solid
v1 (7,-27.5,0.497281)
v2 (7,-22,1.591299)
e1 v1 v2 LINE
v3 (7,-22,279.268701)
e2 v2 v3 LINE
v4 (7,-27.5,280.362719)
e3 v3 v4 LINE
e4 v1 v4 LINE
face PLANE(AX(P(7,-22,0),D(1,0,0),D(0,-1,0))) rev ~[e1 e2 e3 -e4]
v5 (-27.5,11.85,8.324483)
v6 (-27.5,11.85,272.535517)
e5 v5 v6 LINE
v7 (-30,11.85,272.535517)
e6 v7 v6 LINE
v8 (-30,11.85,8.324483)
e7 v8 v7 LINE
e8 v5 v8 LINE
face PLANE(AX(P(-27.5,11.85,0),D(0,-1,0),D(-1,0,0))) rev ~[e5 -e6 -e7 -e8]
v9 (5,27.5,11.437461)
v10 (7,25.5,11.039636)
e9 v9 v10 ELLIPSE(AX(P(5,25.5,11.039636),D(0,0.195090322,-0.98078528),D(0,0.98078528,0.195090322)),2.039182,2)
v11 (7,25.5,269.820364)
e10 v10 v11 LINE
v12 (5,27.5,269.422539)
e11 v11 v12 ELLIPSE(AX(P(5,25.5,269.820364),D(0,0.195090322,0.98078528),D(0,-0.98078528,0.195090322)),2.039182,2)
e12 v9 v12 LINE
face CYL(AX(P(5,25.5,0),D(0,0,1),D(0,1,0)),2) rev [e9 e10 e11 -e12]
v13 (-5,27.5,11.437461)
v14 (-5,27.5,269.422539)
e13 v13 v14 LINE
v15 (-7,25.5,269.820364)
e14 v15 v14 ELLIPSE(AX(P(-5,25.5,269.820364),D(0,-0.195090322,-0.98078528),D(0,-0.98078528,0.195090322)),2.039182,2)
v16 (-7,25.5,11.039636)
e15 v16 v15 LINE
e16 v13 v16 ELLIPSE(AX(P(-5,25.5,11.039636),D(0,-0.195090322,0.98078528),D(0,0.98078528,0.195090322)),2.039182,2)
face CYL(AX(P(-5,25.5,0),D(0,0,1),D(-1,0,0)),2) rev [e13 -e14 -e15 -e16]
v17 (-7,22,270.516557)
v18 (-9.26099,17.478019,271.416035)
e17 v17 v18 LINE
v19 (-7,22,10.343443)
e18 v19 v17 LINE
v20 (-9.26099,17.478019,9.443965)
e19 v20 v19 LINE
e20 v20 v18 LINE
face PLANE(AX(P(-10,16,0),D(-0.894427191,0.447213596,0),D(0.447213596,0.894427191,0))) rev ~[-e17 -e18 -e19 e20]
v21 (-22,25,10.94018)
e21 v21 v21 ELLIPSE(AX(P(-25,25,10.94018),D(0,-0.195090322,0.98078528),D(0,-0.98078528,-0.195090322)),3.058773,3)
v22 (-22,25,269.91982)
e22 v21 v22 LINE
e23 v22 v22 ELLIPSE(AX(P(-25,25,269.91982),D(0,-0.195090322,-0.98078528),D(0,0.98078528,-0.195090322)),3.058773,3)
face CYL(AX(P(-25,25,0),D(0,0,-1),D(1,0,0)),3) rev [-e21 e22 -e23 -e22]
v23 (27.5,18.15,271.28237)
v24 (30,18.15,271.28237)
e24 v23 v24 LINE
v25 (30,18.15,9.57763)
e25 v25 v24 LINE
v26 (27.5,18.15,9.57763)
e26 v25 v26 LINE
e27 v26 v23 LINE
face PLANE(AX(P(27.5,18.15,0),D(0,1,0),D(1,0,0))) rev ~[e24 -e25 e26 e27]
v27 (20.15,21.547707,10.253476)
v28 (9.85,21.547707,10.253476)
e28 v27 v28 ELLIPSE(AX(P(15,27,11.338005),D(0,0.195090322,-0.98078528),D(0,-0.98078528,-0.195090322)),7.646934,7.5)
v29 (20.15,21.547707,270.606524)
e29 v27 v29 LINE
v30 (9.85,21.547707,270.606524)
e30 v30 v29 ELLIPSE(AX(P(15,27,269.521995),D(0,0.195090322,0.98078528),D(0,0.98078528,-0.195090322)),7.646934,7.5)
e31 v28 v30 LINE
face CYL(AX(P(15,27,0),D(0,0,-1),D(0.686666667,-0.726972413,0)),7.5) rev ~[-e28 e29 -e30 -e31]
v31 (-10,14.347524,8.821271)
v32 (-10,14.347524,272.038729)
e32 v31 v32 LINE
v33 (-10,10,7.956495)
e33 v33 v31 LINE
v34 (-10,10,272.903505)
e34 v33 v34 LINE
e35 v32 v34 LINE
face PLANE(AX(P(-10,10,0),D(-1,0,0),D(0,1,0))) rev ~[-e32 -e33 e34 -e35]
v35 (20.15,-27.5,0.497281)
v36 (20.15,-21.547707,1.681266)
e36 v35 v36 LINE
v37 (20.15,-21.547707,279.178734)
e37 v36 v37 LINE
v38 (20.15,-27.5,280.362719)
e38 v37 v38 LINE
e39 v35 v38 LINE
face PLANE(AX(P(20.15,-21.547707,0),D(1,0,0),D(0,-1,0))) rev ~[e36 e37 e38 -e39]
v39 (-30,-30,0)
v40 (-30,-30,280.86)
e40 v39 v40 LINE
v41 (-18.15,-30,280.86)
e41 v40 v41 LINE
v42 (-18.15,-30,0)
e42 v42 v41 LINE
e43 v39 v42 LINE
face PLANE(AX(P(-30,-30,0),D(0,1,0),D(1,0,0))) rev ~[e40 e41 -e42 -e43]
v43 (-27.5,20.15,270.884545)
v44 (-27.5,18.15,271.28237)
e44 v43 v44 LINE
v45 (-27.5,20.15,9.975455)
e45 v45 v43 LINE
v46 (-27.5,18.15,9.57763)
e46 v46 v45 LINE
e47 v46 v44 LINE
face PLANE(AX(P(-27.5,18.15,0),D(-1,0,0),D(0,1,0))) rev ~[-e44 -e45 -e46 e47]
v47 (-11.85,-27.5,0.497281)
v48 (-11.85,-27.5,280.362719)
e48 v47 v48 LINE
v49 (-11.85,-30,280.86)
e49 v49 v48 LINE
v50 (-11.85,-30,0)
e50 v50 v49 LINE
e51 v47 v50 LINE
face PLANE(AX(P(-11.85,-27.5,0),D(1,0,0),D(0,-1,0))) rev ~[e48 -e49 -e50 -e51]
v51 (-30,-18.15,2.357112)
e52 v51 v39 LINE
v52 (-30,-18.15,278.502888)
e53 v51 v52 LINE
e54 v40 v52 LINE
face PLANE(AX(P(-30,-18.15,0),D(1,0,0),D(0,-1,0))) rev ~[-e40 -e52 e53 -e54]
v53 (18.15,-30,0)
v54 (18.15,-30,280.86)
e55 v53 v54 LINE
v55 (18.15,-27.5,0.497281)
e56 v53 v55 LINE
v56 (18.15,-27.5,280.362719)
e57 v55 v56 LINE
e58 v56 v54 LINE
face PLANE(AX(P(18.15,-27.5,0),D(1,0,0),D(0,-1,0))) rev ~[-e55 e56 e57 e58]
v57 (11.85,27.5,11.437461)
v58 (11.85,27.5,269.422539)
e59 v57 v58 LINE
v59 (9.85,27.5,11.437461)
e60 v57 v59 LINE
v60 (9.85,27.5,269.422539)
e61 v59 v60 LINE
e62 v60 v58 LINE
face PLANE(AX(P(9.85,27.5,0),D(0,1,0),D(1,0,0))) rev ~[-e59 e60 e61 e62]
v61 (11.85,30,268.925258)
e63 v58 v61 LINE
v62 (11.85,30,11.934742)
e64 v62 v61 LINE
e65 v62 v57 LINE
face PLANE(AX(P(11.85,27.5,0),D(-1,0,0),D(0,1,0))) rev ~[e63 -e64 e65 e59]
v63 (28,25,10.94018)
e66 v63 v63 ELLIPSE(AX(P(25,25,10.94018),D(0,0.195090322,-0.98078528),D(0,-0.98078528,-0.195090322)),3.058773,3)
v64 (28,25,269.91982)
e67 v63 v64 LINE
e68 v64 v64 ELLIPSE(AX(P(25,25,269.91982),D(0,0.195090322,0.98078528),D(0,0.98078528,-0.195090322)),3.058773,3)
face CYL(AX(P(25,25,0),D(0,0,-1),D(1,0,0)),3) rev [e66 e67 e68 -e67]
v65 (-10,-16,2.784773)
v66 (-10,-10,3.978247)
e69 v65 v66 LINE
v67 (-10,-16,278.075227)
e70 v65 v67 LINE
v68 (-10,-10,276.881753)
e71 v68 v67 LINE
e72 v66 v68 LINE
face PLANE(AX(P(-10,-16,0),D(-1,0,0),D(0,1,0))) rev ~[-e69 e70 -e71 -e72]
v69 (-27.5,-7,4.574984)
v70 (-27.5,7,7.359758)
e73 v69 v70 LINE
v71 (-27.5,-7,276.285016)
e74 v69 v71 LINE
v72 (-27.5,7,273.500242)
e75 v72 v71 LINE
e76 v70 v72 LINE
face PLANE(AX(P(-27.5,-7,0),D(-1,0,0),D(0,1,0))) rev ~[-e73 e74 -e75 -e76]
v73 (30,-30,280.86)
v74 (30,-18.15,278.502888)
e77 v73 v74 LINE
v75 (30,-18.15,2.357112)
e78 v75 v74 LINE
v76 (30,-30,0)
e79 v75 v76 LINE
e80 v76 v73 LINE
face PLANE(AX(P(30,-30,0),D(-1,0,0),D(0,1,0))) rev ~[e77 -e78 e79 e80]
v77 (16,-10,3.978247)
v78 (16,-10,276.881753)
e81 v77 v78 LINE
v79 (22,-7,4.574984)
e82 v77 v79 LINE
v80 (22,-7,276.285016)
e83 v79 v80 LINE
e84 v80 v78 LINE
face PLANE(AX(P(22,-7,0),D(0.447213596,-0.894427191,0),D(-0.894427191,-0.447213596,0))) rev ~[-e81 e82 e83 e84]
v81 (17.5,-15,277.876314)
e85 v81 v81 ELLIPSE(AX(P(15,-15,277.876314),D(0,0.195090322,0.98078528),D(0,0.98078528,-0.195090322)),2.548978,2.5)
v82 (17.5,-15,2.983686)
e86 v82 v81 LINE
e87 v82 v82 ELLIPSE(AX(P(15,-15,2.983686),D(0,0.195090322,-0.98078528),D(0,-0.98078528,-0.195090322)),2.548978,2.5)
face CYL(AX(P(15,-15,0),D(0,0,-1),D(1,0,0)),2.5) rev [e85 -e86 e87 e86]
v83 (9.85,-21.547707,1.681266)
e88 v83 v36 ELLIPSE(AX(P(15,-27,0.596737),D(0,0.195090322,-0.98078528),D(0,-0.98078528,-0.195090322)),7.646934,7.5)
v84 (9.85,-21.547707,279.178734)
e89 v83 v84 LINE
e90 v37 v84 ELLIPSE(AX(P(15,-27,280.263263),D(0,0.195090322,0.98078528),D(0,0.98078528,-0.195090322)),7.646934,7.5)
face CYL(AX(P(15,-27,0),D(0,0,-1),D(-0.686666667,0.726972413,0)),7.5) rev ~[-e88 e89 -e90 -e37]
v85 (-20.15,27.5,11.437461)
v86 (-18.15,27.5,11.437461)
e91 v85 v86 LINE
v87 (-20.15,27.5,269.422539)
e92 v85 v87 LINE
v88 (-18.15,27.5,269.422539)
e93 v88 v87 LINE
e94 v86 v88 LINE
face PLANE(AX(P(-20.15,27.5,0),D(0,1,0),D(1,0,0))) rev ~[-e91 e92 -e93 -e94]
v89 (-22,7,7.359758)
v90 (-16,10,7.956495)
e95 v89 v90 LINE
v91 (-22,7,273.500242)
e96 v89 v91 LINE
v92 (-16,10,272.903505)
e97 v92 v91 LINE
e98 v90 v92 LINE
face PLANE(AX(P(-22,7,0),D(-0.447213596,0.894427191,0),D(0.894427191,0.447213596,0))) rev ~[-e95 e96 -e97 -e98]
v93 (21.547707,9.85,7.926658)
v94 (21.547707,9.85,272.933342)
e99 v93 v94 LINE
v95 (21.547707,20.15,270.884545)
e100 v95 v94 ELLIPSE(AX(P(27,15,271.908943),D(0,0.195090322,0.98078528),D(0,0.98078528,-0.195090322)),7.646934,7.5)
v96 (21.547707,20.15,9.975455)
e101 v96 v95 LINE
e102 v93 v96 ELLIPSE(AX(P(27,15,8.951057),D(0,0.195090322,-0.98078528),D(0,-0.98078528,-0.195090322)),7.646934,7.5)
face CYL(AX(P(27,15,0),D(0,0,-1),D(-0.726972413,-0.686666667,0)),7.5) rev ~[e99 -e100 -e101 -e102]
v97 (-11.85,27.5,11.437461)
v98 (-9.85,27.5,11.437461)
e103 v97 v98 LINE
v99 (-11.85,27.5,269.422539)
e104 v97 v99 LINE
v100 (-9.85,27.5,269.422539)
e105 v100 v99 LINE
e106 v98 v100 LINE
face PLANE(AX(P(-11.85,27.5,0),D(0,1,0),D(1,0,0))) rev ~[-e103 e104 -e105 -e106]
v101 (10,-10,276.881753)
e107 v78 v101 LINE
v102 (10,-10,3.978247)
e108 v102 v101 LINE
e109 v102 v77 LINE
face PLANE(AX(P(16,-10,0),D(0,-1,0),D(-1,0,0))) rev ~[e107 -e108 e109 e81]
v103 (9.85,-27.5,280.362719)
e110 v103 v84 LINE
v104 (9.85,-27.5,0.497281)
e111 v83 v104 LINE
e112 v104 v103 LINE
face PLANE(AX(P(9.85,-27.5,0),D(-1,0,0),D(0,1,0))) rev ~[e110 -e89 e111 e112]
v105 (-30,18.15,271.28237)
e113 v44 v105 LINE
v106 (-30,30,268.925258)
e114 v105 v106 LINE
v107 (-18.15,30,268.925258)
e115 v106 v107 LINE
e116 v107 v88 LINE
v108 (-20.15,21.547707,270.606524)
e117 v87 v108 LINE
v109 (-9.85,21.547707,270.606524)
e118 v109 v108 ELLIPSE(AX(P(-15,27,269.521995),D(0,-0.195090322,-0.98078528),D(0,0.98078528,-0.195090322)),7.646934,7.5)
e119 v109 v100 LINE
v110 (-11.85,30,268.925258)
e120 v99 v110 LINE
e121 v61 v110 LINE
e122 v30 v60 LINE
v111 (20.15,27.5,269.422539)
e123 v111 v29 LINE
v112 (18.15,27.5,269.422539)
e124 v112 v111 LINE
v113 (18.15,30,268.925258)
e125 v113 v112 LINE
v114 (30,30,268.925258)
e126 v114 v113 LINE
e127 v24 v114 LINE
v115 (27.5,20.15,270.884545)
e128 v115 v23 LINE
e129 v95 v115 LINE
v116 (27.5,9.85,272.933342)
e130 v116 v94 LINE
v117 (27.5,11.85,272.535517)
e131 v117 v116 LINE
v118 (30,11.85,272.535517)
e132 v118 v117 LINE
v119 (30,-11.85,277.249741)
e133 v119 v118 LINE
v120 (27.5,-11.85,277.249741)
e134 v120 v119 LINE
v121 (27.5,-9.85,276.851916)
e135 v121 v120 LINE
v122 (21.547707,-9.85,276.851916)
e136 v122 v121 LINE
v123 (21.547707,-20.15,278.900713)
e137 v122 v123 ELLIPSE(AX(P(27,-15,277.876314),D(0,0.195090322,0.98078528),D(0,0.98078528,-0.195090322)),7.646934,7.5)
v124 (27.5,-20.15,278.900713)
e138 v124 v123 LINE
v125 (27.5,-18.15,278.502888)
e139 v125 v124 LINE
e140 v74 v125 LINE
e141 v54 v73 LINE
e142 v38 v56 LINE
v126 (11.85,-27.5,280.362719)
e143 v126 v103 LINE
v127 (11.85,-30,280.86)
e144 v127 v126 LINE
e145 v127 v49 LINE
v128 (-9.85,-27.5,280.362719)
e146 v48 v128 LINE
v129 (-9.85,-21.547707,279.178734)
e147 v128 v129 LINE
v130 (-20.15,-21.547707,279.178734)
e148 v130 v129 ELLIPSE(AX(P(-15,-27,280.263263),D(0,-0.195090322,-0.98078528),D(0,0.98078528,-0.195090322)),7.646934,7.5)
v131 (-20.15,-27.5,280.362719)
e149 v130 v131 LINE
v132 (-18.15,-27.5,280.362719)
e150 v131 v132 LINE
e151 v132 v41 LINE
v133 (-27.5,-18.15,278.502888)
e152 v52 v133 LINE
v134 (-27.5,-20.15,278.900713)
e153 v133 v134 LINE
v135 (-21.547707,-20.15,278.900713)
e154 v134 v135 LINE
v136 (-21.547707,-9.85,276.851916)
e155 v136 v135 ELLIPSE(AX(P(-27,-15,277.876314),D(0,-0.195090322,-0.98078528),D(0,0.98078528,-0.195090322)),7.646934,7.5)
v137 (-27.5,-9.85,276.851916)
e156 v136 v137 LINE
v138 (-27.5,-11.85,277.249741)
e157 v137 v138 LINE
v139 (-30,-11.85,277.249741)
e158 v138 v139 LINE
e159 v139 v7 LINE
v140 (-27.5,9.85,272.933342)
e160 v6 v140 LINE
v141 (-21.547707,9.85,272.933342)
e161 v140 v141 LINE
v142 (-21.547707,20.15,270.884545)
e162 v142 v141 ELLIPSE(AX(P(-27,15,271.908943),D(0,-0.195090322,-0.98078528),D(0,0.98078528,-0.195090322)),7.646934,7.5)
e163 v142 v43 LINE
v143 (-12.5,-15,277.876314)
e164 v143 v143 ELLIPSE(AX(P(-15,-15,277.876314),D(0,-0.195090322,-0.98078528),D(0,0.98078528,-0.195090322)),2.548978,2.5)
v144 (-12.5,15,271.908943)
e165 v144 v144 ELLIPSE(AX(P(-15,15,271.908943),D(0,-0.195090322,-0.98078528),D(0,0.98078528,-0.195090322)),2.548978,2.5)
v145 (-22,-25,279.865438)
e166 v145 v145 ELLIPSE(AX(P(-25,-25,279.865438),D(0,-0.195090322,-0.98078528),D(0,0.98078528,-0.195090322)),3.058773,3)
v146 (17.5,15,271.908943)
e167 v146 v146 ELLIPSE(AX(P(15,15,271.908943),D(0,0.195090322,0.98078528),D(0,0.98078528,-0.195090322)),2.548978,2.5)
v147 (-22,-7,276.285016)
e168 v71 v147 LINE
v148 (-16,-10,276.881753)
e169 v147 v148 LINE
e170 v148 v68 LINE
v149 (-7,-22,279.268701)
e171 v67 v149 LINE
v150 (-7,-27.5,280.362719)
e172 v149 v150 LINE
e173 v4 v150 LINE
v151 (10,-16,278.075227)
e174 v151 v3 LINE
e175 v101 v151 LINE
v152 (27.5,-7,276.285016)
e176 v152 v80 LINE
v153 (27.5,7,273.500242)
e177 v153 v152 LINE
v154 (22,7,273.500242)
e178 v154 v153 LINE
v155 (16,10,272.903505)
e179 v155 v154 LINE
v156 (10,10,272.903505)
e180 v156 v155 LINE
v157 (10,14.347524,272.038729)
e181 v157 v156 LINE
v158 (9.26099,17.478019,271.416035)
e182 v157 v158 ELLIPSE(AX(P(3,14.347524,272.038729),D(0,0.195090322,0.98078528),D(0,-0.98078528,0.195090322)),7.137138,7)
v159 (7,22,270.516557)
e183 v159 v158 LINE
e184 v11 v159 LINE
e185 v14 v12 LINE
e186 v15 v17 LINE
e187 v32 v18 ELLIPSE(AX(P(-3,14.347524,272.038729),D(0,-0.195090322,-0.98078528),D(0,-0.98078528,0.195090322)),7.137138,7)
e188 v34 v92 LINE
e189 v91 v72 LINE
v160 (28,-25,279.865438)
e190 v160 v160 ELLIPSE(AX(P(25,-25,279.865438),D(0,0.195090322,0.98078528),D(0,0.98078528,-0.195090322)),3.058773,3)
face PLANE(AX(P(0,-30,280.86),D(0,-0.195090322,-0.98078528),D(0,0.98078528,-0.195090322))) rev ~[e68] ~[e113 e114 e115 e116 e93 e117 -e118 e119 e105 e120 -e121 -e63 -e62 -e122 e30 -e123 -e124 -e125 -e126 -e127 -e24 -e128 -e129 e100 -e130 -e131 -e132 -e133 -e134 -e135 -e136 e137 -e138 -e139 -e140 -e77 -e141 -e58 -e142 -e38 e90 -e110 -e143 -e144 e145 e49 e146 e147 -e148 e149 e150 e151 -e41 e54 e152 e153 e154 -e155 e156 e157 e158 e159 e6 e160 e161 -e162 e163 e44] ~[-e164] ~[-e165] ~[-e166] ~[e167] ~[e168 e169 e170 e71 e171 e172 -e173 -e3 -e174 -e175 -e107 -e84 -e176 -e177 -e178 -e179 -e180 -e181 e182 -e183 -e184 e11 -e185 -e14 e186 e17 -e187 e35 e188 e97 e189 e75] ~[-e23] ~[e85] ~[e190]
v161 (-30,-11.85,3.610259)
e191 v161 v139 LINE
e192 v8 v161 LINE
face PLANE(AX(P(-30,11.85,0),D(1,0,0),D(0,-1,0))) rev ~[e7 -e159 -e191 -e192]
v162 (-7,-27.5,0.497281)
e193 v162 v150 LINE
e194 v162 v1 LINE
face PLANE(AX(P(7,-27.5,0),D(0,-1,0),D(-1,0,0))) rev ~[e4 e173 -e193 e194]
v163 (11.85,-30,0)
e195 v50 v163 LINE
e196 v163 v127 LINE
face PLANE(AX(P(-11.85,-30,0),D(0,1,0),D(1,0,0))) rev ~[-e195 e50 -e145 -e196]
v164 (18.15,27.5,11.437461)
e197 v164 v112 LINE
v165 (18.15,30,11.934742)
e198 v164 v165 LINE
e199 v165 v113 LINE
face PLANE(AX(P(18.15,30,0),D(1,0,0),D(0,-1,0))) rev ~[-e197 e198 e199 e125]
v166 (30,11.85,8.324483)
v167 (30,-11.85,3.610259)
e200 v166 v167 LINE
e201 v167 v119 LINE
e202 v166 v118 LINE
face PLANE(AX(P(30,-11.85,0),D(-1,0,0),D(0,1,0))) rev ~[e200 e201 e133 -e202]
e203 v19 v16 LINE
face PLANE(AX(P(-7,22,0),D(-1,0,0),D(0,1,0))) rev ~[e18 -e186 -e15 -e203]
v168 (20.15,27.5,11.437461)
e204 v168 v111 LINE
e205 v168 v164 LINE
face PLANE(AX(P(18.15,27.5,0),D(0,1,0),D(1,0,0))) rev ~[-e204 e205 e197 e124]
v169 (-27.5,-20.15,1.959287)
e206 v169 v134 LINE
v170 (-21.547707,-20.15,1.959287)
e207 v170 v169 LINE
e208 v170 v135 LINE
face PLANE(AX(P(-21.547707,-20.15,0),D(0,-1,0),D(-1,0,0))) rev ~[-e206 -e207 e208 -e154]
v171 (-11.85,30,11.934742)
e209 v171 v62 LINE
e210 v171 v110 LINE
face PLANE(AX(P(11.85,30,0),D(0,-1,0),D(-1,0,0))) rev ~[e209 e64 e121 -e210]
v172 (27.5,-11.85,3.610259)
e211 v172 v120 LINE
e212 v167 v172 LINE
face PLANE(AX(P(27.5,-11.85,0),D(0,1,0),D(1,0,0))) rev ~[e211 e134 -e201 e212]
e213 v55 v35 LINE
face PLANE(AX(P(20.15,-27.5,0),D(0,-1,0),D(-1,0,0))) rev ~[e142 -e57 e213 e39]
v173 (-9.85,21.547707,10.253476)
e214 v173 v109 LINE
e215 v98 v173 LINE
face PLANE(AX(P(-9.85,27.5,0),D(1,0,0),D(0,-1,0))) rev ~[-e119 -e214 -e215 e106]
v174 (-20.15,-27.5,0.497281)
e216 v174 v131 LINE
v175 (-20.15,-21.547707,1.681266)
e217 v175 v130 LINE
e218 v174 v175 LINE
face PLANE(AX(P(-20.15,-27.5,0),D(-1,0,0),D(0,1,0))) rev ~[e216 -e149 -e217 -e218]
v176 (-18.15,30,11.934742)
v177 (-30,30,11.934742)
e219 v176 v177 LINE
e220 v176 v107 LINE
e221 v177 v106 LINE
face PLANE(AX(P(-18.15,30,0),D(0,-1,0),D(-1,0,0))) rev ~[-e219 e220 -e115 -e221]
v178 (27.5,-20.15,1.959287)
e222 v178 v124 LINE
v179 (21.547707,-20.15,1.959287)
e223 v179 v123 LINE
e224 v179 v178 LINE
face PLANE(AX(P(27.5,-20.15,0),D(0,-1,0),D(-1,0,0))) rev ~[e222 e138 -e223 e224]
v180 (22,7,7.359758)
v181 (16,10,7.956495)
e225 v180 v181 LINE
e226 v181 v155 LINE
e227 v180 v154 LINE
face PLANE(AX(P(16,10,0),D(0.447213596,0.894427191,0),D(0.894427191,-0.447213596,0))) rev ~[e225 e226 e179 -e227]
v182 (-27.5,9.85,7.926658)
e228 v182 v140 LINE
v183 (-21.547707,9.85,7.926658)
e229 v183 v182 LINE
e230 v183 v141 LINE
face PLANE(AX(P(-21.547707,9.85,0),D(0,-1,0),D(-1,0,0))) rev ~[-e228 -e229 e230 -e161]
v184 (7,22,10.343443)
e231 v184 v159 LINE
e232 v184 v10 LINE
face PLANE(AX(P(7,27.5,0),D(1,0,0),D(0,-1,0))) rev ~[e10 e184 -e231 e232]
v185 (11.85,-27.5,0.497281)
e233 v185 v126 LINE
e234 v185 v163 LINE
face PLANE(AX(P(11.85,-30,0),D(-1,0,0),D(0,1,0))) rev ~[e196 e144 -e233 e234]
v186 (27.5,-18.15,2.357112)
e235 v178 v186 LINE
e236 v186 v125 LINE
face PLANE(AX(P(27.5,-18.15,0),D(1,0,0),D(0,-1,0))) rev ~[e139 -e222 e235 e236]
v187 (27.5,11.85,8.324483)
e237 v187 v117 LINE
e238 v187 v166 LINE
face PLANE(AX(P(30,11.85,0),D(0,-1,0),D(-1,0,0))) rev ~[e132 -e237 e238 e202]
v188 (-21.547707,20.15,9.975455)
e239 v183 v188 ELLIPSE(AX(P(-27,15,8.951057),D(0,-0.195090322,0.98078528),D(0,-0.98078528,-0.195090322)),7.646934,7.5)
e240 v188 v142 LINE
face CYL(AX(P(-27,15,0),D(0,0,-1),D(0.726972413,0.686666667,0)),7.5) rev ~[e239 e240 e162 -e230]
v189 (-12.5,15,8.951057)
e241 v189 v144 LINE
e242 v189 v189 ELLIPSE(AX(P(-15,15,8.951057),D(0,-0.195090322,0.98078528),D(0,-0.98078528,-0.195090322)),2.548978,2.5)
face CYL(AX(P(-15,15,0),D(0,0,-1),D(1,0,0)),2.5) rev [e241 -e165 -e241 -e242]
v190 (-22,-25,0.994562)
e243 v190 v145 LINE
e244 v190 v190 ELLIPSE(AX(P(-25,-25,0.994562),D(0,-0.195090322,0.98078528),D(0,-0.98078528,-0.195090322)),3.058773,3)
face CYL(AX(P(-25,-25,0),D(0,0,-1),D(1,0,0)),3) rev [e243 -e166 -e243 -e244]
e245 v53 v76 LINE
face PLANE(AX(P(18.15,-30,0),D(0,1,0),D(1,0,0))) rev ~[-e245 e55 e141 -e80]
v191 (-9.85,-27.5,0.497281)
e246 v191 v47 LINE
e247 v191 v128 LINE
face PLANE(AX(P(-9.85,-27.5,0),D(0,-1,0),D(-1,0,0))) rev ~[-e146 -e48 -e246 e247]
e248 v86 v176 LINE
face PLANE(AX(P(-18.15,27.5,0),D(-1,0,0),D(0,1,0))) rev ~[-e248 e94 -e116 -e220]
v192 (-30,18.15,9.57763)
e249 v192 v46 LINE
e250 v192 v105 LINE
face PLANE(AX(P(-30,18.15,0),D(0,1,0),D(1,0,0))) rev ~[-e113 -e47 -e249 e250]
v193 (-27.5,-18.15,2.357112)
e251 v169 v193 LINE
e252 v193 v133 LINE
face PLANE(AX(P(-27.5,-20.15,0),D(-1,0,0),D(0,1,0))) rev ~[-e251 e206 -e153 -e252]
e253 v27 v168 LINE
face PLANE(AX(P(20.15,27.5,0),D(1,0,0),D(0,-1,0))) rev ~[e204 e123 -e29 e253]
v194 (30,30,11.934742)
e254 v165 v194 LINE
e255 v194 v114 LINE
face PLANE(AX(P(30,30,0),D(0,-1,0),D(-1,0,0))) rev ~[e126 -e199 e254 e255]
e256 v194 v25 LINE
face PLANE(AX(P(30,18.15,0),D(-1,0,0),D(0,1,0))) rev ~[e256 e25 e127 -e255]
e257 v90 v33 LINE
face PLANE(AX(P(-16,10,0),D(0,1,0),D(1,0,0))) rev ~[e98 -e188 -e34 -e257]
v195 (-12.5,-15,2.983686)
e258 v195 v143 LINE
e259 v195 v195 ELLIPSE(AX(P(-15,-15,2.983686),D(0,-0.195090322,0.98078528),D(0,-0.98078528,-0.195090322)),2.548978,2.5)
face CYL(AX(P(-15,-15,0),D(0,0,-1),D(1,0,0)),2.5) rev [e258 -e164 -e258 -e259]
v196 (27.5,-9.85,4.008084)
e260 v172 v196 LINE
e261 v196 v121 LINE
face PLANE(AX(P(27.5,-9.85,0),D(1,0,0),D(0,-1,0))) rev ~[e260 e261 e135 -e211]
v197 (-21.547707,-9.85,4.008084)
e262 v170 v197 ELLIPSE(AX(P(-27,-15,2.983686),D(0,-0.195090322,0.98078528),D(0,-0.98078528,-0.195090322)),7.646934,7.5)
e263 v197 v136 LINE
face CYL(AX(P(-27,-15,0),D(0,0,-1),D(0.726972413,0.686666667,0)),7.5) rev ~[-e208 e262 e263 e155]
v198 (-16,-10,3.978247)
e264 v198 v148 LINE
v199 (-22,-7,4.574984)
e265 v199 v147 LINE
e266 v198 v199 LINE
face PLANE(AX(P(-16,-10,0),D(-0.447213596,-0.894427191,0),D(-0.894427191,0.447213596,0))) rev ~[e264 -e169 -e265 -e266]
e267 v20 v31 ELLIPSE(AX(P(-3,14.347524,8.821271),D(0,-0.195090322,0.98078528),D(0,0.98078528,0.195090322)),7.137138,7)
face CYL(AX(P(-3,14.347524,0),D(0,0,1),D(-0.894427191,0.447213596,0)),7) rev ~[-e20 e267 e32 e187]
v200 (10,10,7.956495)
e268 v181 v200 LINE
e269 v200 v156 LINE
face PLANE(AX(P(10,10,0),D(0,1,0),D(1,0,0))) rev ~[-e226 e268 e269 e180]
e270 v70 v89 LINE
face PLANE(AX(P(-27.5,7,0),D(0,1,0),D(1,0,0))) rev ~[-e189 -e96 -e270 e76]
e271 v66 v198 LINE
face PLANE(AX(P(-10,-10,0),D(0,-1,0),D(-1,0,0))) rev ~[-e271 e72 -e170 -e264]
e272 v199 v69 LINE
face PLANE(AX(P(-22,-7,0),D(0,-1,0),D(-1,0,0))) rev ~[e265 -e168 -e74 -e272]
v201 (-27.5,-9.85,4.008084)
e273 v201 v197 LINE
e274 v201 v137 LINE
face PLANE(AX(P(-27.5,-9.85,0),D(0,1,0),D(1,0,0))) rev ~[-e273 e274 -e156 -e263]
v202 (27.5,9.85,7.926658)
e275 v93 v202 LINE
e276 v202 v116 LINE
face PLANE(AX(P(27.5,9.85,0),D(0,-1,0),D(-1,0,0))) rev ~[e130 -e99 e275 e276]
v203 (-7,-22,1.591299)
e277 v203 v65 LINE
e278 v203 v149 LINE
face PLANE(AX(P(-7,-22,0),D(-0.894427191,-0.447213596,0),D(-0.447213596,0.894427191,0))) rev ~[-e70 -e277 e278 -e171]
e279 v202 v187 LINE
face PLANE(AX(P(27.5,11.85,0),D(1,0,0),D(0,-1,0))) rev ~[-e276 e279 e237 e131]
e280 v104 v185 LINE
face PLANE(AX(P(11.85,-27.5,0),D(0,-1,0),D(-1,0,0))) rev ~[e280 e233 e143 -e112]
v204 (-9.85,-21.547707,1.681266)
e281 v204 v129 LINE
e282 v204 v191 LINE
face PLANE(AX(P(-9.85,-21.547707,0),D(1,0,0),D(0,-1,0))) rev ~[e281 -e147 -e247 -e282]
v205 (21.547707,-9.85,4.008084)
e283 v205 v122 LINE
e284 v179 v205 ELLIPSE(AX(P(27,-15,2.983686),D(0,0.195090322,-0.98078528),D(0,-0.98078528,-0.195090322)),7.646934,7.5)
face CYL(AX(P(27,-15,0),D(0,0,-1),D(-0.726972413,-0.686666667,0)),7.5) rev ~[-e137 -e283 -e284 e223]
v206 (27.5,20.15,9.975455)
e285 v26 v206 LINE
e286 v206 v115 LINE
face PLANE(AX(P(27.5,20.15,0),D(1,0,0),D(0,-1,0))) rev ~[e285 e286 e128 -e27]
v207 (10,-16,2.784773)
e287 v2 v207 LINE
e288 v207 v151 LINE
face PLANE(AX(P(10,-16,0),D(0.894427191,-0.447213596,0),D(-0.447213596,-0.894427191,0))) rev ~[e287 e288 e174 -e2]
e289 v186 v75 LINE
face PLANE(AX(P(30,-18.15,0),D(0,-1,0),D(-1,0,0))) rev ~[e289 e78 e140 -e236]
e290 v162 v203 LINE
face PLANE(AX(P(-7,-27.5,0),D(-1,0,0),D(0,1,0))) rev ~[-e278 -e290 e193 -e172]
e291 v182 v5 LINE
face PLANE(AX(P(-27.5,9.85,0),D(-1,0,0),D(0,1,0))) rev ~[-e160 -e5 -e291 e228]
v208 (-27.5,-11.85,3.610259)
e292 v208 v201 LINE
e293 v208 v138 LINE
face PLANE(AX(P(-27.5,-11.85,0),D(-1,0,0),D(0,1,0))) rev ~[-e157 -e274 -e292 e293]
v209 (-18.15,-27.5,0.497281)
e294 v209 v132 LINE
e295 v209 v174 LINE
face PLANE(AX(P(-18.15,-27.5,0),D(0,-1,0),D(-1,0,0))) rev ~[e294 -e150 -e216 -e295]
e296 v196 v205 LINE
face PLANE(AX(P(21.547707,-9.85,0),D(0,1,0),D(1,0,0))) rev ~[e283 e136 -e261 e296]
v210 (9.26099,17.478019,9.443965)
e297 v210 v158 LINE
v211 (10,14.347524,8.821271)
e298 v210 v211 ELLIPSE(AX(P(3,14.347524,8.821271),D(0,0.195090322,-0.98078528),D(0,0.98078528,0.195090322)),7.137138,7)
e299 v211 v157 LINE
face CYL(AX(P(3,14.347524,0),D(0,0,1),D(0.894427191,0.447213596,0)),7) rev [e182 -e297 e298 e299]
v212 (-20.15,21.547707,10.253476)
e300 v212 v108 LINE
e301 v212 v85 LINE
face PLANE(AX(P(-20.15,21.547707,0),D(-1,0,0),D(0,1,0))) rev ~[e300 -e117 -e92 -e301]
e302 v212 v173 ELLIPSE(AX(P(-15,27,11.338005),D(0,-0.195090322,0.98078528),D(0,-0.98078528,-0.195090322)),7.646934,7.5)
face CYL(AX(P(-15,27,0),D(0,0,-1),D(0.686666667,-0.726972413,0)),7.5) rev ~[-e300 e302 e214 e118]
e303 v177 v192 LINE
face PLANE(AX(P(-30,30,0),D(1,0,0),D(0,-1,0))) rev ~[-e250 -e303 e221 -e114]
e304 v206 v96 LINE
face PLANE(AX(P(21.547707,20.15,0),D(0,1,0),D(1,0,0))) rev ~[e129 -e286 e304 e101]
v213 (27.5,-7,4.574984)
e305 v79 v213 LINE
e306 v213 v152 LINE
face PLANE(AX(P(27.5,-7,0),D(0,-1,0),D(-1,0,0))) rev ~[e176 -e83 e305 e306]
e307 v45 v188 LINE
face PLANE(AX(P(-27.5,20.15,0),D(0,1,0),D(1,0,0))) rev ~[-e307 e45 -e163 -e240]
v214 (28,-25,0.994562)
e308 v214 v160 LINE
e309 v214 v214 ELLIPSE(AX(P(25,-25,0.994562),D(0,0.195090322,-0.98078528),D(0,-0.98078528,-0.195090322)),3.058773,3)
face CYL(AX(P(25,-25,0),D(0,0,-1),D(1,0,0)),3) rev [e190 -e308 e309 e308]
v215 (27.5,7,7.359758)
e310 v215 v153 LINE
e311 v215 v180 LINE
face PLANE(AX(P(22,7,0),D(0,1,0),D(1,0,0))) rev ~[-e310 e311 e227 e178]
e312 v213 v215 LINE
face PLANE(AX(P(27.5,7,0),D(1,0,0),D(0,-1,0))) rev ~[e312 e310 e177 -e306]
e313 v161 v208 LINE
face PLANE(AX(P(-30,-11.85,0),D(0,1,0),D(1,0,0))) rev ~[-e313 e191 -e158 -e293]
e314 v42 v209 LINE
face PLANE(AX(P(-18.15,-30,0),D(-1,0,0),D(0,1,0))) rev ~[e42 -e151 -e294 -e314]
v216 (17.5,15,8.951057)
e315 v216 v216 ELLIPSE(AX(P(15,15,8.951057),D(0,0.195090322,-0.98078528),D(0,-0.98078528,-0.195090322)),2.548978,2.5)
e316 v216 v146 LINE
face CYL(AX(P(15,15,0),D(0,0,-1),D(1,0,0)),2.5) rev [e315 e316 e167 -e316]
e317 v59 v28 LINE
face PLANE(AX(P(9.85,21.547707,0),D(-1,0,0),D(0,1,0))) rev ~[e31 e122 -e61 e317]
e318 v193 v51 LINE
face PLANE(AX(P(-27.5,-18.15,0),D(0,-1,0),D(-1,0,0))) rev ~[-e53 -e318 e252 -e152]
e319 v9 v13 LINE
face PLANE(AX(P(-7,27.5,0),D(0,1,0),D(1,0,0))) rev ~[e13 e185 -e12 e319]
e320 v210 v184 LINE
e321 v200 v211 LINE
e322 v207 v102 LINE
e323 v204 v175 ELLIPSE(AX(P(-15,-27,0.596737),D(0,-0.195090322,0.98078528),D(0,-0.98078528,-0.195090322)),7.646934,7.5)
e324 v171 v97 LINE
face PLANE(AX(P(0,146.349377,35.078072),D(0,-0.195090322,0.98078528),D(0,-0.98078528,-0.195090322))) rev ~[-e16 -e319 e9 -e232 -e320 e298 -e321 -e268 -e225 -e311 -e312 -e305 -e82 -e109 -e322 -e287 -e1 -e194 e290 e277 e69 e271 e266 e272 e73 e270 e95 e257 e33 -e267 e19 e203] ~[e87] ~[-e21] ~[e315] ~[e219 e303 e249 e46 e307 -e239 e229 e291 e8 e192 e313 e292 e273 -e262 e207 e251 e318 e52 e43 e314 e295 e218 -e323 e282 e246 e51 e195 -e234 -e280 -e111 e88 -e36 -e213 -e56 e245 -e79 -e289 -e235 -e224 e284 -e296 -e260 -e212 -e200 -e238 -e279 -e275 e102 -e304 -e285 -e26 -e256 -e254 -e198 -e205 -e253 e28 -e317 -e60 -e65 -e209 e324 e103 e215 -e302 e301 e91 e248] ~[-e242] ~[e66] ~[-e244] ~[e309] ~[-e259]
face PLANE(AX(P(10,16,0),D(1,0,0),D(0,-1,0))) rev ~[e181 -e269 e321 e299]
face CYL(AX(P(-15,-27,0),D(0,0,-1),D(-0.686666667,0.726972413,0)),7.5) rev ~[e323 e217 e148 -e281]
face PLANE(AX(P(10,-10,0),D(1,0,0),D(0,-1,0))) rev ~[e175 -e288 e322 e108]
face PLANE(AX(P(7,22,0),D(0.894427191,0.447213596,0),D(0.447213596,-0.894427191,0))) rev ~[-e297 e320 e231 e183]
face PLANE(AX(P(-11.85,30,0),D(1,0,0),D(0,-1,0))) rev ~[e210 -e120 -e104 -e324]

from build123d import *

# Parameters (mm, degrees)
F0_R          = 3
F0_R_2        = 2.5
F1_DEPTH      = 280.86
F2_R          = 2
F3_R          = 7
F6_DEPTH      = 30
F6_DEPTH_BACK = 30


# Not quite as in the source:
# - a feature names something its author has since deleted; it is built from what else it names


with BuildPart() as f1:
    # F0 (on Top) → F1 (new body)
    with BuildSketch(Plane.XY):
        with BuildLine():
            Line((18.15, -30), (30, -30))
            Line((30, -30), (30, -18.15))
            Line((30, -18.15), (27.5, -18.15))
            Line((27.5, -18.15), (27.5, -20.15))
            Line((27.5, -20.15), (21.5477069044, -20.15))
            ThreePointArc((21.5477069044, -20.15), (19.5, -15), (21.5477069044, -9.85))
            Line((21.5477069044, -9.85), (27.5, -9.85))
            Line((27.5, -9.85), (27.5, -11.85))
            Line((27.5, -11.85), (30, -11.85))
            Line((30, -11.85), (30, 11.85))
            Line((30, 11.85), (27.5, 11.85))
            Line((27.5, 11.85), (27.5, 9.85))
            Line((27.5, 9.85), (21.5477069044, 9.85))
            ThreePointArc((21.5477069044, 9.85), (19.5, 15), (21.5477069044, 20.15))
            Line((21.5477069044, 20.15), (27.5, 20.15))
            Line((27.5, 20.15), (27.5, 18.15))
            Line((27.5, 18.15), (30, 18.15))
            Line((30, 18.15), (30, 30))
            Line((30, 30), (18.15, 30))
            Line((18.15, 30), (18.15, 27.5))
            Line((18.15, 27.5), (20.15, 27.5))
            Line((20.15, 27.5), (20.15, 21.5477069044))
            ThreePointArc((20.15, 21.5477069044), (15, 19.5), (9.85, 21.5477069044))
            Line((9.85, 21.5477069044), (9.85, 27.5))
            Line((9.85, 27.5), (11.85, 27.5))
            Line((11.85, 27.5), (11.85, 30))
            Line((11.85, 30), (-11.85, 30))
            Line((-11.85, 30), (-11.85, 27.5))
            Line((-11.85, 27.5), (-9.85, 27.5))
            Line((-9.85, 27.5), (-9.85, 21.5477069044))
            ThreePointArc((-9.85, 21.5477069044), (-15, 19.5), (-20.15, 21.5477069044))
            Line((-20.15, 21.5477069044), (-20.15, 27.5))
            Line((-20.15, 27.5), (-18.15, 27.5))
            Line((-18.15, 27.5), (-18.15, 30))
            Line((-18.15, 30), (-30, 30))
            Line((-30, 30), (-30, 18.15))
            Line((-30, 18.15), (-27.5, 18.15))
            Line((-27.5, 18.15), (-27.5, 20.15))
            Line((-27.5, 20.15), (-21.5477069044, 20.15))
            ThreePointArc((-21.5477069044, 20.15), (-19.5, 15), (-21.5477069044, 9.85))
            Line((-21.5477069044, 9.85), (-27.5, 9.85))
            Line((-27.5, 9.85), (-27.5, 11.85))
            Line((-27.5, 11.85), (-30, 11.85))
            Line((-30, 11.85), (-30, -11.85))
            Line((-30, -11.85), (-27.5, -11.85))
            Line((-27.5, -11.85), (-27.5, -9.85))
            Line((-27.5, -9.85), (-21.5477069044, -9.85))
            ThreePointArc((-21.5477069044, -9.85), (-19.5, -15), (-21.5477069044, -20.15))
            Line((-21.5477069044, -20.15), (-27.5, -20.15))
            Line((-27.5, -20.15), (-27.5, -18.15))
            Line((-27.5, -18.15), (-30, -18.15))
            Line((-30, -18.15), (-30, -30))
            Line((-30, -30), (-18.15, -30))
            Line((-18.15, -30), (-18.15, -27.5))
            Line((-18.15, -27.5), (-20.15, -27.5))
            Line((-20.15, -27.5), (-20.15, -21.5477069044))
            ThreePointArc((-20.15, -21.5477069044), (-15, -19.5), (-9.85, -21.5477069044))
            Line((-9.85, -21.5477069044), (-9.85, -27.5))
            Line((-9.85, -27.5), (-11.85, -27.5))
            Line((-11.85, -27.5), (-11.85, -30))
            Line((-11.85, -30), (11.85, -30))
            Line((11.85, -30), (11.85, -27.5))
            Line((11.85, -27.5), (9.85, -27.5))
            Line((9.85, -27.5), (9.85, -21.5477069044))
            ThreePointArc((9.85, -21.5477069044), (15, -19.5), (20.15, -21.5477069044))
            Line((20.15, -21.5477069044), (20.15, -27.5))
            Line((20.15, -27.5), (18.15, -27.5))
            Line((18.15, -27.5), (18.15, -30))
        make_face()
        with Locations((-25, -25)):
            Circle(F0_R, mode=Mode.SUBTRACT)
        with Locations((-15, -15)):
            Circle(F0_R_2, mode=Mode.SUBTRACT)
        with Locations((25, -25)):
            Circle(F0_R, mode=Mode.SUBTRACT)
        with Locations((15, -15)):
            Circle(F0_R_2, mode=Mode.SUBTRACT)
        with Locations((-25, 25)):
            Circle(F0_R, mode=Mode.SUBTRACT)
        with Locations((-15, 15)):
            Circle(F0_R_2, mode=Mode.SUBTRACT)
        Polygon((-7, 22), (-7, 27.5), (0, 27.5), (7, 27.5), (7, 22), (10, 16), (10, 10), (16, 10), (22, 7), (27.5, 7), (27.5, 0), (27.5, -7), (22, -7), (16, -10), (10, -10), (10, -16), (7, -22), (7, -27.5), (0, -27.5), (-7, -27.5), (-7, -22), (-10, -16), (-10, -10), (-16, -10), (-22, -7), (-27.5, -7), (-27.5, 0), (-27.5, 7), (-22, 7), (-16, 10), (-10, 10), (-10, 16), align=None, mode=Mode.SUBTRACT)
        with Locations((15, 15)):
            Circle(F0_R_2, mode=Mode.SUBTRACT)
        with Locations((25, 25)):
            Circle(F0_R, mode=Mode.SUBTRACT)
    extrude(amount=F1_DEPTH)

    # F2
    f2_edges = [f1.edges().sort_by_distance(p)[0] for p in [
        (-7, 27.5, 140.43),
        (7, 27.5, 140.43),
    ]]
    fillet(f2_edges, radius=F2_R)

    # F3
    f3_edges = [f1.edges().sort_by_distance(p)[0] for p in [
        (-10, 16, 140.43),
        (10, 16, 140.43),
    ]]
    fillet(f3_edges, radius=F3_R)

    # F5 (on Right) → F6 (cut, two sides)
    with BuildSketch(Plane.YZ) as f6_sk:
        Polygon((166.5976946582, -66.7170951811), (146.3493769552, 35.0780720561), (-30, 0), (-9.751682297, -101.7951672372), align=None)
        Polygon((135.5963626007, 247.9208354856), (151.7094622056, 328.9268574701), (-13.8869003951, 361.8660219845), (-30, 280.86), align=None)
    extrude(amount=F6_DEPTH, mode=Mode.SUBTRACT)
    extrude(f6_sk.sketch, amount=-F6_DEPTH_BACK, mode=Mode.SUBTRACT)


solid = f1.part
